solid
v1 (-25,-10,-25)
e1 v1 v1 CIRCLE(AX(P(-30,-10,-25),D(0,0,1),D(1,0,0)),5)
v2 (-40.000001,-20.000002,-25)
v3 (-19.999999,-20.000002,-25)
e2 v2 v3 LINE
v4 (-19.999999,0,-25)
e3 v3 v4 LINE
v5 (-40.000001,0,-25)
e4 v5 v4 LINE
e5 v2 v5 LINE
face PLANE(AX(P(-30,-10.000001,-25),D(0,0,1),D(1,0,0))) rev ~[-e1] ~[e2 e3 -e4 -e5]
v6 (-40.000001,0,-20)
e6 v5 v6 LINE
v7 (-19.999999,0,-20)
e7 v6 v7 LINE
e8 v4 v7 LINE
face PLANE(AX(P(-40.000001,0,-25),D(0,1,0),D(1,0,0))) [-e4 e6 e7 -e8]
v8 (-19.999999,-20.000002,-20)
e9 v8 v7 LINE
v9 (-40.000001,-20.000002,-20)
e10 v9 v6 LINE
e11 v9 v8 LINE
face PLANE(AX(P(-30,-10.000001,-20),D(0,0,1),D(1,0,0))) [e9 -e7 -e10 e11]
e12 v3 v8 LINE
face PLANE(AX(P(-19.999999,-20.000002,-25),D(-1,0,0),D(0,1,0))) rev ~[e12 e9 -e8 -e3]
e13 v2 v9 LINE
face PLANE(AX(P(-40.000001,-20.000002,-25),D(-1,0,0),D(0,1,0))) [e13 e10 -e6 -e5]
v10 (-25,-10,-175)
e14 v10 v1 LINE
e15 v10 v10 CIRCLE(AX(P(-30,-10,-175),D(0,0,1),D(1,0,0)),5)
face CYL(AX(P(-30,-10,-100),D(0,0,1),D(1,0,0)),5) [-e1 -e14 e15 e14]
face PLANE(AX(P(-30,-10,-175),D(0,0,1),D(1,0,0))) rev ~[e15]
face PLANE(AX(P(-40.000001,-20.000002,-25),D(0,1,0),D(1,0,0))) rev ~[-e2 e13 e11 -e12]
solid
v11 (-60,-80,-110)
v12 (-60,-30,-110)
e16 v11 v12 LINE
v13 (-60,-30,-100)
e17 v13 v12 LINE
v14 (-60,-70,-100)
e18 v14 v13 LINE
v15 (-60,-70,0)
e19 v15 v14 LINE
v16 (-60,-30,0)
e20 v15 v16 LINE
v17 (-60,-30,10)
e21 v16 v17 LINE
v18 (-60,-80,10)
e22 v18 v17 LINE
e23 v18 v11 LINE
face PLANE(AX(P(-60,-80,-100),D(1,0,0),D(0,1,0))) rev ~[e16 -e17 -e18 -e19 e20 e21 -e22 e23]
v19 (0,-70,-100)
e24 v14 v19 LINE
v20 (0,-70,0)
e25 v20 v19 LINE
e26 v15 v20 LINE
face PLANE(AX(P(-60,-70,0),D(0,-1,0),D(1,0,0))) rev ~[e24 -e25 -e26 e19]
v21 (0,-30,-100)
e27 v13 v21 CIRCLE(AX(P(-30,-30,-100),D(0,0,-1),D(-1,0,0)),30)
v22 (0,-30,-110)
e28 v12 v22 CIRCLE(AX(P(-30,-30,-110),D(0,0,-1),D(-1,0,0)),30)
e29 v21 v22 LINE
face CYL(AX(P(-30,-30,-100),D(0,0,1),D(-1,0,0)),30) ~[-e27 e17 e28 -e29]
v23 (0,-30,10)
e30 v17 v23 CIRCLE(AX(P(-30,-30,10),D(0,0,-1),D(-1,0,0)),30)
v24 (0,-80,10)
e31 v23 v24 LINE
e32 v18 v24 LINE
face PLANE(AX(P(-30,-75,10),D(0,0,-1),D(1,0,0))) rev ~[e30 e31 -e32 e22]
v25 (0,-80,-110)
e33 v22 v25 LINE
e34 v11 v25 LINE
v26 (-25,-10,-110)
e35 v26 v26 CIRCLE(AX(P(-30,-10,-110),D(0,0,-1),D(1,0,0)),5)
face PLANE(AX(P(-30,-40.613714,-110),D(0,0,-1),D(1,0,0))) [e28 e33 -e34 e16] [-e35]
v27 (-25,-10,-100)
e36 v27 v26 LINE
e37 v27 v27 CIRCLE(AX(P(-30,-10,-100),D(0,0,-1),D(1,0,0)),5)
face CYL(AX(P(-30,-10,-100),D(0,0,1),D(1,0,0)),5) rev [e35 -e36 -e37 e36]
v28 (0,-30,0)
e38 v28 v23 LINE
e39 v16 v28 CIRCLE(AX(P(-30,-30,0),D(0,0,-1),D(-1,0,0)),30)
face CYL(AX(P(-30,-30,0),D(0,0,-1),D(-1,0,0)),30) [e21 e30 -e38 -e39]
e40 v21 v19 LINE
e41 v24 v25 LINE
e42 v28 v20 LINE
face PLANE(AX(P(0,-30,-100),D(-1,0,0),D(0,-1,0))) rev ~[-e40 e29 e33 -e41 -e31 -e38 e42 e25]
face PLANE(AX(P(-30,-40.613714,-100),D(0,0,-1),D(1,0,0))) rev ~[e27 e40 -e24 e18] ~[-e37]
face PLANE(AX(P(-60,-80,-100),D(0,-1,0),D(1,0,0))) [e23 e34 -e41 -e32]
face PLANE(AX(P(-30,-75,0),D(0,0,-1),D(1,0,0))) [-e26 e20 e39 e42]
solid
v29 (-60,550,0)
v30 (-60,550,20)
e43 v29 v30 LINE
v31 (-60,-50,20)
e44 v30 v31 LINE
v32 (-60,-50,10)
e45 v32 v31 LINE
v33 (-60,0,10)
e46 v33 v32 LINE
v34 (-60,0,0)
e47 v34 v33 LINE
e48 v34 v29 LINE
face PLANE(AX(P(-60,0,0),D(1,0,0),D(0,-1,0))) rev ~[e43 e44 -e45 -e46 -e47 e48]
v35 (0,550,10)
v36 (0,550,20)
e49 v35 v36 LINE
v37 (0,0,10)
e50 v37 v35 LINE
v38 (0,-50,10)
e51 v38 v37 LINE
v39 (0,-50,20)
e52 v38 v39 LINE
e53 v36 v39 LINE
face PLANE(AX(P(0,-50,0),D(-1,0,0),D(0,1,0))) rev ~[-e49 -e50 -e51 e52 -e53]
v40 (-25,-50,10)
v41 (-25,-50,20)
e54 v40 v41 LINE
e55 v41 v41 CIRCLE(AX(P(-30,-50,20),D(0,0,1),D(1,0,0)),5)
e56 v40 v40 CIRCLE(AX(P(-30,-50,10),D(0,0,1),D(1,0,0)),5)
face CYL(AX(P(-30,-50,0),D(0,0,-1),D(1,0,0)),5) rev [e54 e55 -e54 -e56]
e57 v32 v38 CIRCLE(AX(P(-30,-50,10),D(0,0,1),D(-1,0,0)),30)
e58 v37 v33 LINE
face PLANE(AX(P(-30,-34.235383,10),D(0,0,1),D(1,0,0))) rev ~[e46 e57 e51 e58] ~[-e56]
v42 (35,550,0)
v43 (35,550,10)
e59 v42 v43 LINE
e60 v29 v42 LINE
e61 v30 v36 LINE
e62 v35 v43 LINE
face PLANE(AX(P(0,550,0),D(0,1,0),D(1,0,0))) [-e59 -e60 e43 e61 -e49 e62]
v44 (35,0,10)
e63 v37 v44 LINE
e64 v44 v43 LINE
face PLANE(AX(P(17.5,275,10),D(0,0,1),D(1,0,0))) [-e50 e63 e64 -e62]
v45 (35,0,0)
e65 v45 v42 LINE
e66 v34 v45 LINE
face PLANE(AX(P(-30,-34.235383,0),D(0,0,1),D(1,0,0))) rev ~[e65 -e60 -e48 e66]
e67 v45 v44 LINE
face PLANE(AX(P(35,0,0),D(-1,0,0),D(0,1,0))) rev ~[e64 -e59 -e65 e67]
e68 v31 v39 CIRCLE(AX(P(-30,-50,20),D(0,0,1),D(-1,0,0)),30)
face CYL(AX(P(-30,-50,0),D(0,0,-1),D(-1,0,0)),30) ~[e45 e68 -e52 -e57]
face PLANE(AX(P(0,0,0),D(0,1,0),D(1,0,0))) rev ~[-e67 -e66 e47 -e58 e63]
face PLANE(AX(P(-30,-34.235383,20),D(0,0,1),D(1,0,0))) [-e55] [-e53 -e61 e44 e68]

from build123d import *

# Parameters (mm, degrees)
F1_W           = 60
F1_H           = 550
F2_DEPTH       = 20
F1_W_2         = 35
F3_DEPTH       = 10
F1_R           = 5
F4_DEPTH       = 20
F5_DEPTH       = 10
F6_W           = 60
F6_H           = 10
F7_DEPTH       = 10
F8_DEPTH       = 100
F9_R           = 5
F9_W           = 60
F9_H           = 10
F10_DEPTH      = 10
F11_R          = 5
F12_DEPTH      = 75
F12_DEPTH_BACK = 75
F13_W          = 20.000001848
F13_H          = 20.000001848
F13_R          = 5
F14_DEPTH      = 5


with BuildPart() as f2:
    # F1 (on Top) → F2 (new body)
    with BuildSketch(Plane.XY):
        with Locations((-30, 275)):
            Rectangle(F1_W, F1_H)
    extrude(amount=F2_DEPTH)

    # F1 (on Top) → F3 (join)
    with BuildSketch(Plane.XY):
        with Locations((17.5, 275)):
            Rectangle(F1_W_2, F1_H)
    extrude(amount=F3_DEPTH)

    # F1 (on Top) → F4 (join)
    with BuildSketch(Plane.XY):
        with BuildLine():
            Line((0, -50), (0, 0))
            Line((0, 0), (-60, 0))
            Line((-60, 0), (-60, -50))
            ThreePointArc((-60, -50), (-30, -80), (0, -50))
        make_face()
        with Locations((-30, -50)):
            Circle(F1_R, mode=Mode.SUBTRACT)
    extrude(amount=F4_DEPTH)

    # F1 (on Top) → F5 (cut)
    with BuildSketch(Plane.XY):
        with BuildLine():
            Line((0, -50), (0, 0))
            Line((0, 0), (-60, 0))
            Line((-60, 0), (-60, -50))
            ThreePointArc((-60, -50), (-30, -80), (0, -50))
        make_face()
        with Locations((-30, -50)):
            Circle(F1_R, mode=Mode.SUBTRACT)
    extrude(amount=F5_DEPTH, mode=Mode.SUBTRACT)


with BuildPart() as f7:
    # F6 (on face) → F7 (new body)
    with BuildSketch(Plane(origin=(0, 0, 0), x_dir=(1, 0, 0), z_dir=(0, 0, -1))):
        with Locations((-30, 75)):
            Rectangle(F6_W, F6_H)
        with BuildLine():
            Line((-60, 70), (-60, 30))
            ThreePointArc((-60, 30), (-51.2132034519, 8.7867965807), (-30.0000000462, 0))
            ThreePointArc((-30.0000000462, 0), (-8.7867965807, 8.7867965481), (0, 30))
            Line((0, 30), (0, 70))
            Line((0, 70), (-60, 70))
        make_face()
    extrude(amount=-F7_DEPTH)

    # F6 (on face) → F8 (join)
    with BuildSketch(Plane(origin=(0, 0, 0), x_dir=(1, 0, 0), z_dir=(0, 0, -1))):
        with Locations((-30, 75)):
            Rectangle(F6_W, F6_H)
    extrude(amount=F8_DEPTH)

    # F9 (on face) → F10 (join)
    with BuildSketch(Plane(origin=(0, 0, -100), x_dir=(1, 0, 0), z_dir=(0, 0, -1))):
        with BuildLine():
            Line((0, 70), (-60, 70))
            Line((-60, 70), (-60, 30))
            ThreePointArc((-60, 30), (-51.2132034356, 8.7867965644), (-30, 0))
            ThreePointArc((-30, 0), (-8.7867965644, 8.7867965644), (0, 30))
            Line((0, 30), (0, 70))
        make_face()
        with Locations((-30, 10)):
            Circle(F9_R, mode=Mode.SUBTRACT)
        with Locations((-30, 75)):
            Rectangle(F9_W, F9_H)
    extrude(amount=F10_DEPTH)


with BuildPart() as f12:
    # F11 (on face) → F12 (new body, two sides)
    with BuildSketch(Plane.XY.offset(-100)) as f12_sk:
        with Locations((-29.9999999688, -10)):
            Circle(F11_R)
    extrude(amount=F12_DEPTH)
    extrude(f12_sk.sketch, amount=-F12_DEPTH_BACK)

    # F13 (on face) → F14 (join)
    with BuildSketch(Plane.XY.offset(-25)):
        with Locations((-30, -10.000000924)):
            Rectangle(F13_W, F13_H)
        with Locations((-29.9999999688, -10)):
            Circle(F13_R, mode=Mode.SUBTRACT)
        with Locations((-30, -10.000000924)):
            Rectangle(F13_W, F13_H)
    extrude(amount=F14_DEPTH)


solid = Compound([f2.part, f7.part, f12.part])
